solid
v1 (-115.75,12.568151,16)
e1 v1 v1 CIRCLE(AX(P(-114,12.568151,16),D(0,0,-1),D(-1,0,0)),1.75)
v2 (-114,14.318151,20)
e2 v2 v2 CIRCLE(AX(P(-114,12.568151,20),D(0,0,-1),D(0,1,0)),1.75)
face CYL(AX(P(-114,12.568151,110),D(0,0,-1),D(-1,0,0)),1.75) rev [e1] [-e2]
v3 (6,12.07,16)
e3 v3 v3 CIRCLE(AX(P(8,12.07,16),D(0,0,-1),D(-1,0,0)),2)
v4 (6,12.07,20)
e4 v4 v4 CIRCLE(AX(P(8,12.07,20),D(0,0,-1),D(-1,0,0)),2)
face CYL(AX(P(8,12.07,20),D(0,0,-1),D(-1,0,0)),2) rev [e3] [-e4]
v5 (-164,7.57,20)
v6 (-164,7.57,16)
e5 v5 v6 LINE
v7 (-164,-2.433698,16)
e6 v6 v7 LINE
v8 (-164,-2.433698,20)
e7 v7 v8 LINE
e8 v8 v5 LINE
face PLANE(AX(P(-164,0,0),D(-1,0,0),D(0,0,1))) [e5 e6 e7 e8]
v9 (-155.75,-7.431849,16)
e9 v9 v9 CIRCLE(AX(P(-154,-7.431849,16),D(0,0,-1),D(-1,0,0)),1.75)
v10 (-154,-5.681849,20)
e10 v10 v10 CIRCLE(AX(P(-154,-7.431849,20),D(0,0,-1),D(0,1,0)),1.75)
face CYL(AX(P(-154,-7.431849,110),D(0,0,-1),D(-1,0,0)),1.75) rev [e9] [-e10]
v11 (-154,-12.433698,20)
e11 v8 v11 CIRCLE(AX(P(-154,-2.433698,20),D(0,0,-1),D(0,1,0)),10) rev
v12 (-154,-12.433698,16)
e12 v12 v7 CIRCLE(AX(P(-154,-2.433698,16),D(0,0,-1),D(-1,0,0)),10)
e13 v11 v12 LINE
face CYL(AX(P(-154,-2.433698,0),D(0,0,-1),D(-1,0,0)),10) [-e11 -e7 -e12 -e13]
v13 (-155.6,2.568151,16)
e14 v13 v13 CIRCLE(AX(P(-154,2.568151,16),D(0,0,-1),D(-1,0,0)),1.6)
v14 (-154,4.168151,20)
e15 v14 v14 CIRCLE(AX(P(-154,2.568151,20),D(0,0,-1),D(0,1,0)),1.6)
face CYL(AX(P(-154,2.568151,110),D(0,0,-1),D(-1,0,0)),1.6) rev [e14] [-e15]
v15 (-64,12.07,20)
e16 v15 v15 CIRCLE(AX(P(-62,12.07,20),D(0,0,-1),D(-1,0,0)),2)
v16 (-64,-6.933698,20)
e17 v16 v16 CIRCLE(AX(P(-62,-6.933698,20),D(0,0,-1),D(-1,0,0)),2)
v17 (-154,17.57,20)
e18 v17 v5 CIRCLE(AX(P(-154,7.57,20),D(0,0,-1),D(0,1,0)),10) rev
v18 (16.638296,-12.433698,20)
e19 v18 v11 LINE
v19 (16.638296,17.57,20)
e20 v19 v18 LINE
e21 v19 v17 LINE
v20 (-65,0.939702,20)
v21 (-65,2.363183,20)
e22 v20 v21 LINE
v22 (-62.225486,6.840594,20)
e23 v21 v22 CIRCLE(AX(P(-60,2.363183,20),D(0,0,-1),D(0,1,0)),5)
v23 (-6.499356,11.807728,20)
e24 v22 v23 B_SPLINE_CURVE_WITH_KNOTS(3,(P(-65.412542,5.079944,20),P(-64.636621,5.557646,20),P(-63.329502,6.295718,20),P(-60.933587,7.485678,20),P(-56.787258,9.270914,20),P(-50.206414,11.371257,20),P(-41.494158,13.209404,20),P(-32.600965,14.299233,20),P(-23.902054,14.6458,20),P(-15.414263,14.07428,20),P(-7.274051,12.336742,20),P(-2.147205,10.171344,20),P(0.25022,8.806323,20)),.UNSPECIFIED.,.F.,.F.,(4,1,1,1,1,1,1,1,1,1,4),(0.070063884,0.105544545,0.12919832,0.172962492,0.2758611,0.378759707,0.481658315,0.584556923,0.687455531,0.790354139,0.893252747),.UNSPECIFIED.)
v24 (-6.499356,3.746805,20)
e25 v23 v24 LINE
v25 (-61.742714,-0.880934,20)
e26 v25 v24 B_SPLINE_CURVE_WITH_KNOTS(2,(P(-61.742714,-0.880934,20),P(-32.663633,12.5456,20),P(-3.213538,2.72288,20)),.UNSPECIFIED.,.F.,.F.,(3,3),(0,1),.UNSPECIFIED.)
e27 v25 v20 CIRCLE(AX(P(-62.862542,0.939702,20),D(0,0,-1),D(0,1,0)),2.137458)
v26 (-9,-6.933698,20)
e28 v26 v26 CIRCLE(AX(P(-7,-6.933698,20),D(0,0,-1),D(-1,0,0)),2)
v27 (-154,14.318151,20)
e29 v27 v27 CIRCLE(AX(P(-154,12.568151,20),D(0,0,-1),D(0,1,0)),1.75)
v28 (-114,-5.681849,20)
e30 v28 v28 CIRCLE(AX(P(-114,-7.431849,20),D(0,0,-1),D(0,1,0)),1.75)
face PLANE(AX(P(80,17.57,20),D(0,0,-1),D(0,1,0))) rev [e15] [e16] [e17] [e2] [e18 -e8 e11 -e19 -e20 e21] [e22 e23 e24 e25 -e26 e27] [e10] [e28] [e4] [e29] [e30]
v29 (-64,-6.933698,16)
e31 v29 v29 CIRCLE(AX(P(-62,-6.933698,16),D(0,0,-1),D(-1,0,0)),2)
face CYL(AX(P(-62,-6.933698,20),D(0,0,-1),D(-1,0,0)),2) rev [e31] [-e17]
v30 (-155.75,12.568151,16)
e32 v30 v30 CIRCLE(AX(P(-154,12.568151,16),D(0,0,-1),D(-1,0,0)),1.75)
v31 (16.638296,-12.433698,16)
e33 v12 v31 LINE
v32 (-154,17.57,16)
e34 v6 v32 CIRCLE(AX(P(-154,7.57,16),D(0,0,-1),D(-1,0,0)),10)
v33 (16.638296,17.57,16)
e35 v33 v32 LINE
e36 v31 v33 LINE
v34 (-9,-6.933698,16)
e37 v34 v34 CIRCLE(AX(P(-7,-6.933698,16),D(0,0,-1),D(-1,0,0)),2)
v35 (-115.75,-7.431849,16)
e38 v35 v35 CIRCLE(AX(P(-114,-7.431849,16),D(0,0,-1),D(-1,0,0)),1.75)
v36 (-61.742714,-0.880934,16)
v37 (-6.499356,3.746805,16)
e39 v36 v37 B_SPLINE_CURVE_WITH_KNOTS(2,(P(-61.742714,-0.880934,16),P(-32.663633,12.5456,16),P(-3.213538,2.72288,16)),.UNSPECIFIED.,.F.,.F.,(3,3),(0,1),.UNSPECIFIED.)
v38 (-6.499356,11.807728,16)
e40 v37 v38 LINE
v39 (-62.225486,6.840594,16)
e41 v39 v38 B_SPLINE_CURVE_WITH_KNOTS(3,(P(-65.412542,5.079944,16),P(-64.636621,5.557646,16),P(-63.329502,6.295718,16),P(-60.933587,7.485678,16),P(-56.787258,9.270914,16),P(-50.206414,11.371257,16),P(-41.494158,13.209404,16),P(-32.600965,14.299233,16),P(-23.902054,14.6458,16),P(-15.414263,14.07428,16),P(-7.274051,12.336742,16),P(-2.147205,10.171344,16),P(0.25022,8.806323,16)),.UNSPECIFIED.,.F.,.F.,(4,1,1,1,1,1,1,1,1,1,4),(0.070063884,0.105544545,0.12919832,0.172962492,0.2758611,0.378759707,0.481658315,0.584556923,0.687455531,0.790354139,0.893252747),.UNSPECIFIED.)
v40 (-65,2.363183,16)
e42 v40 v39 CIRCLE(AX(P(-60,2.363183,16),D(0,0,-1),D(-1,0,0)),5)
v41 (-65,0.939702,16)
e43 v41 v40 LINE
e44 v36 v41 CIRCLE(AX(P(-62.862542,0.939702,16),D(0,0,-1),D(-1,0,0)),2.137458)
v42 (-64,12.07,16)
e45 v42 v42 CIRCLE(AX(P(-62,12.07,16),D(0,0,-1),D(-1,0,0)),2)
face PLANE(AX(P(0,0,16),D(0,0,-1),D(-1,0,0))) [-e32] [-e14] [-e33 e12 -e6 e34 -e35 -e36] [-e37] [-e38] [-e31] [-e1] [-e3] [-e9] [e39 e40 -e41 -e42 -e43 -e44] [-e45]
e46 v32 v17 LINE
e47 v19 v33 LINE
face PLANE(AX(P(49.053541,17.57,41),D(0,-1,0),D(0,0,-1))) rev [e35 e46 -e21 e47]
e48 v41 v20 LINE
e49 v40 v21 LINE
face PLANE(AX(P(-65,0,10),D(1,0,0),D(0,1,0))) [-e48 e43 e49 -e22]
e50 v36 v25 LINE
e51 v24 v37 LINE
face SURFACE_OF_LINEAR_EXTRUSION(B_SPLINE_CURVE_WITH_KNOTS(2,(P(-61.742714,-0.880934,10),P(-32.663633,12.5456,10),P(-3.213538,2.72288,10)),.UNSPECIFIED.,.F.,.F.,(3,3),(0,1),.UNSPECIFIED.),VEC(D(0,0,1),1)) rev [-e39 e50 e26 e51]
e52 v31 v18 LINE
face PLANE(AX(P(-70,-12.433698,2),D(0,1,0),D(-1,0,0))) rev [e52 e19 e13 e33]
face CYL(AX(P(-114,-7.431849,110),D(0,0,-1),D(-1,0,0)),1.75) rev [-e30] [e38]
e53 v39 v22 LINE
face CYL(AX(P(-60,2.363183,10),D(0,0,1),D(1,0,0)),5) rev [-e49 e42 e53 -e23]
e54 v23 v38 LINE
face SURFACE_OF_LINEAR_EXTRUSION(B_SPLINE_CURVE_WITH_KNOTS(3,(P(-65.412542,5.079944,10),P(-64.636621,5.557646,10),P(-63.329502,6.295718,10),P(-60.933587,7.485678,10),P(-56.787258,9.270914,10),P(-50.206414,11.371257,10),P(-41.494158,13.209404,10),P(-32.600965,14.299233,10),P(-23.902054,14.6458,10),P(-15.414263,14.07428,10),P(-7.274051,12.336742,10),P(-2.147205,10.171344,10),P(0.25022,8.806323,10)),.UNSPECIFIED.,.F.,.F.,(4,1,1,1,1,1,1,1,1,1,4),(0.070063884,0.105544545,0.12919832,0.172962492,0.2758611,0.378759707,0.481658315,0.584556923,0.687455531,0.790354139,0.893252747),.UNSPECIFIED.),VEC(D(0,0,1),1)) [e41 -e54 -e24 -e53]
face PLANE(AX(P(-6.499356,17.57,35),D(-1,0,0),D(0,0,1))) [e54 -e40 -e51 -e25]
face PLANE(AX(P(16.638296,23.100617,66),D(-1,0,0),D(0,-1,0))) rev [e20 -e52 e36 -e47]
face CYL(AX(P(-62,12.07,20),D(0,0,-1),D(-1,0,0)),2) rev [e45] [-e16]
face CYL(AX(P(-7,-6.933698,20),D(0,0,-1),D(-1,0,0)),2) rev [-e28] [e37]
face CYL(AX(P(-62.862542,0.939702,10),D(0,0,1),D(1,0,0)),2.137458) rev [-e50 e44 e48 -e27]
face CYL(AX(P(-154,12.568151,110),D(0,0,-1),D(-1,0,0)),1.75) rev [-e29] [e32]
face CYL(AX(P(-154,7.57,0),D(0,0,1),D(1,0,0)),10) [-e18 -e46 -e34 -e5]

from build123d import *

# Parameters (mm, degrees)
SKETCH_1_W           = 140
SKETCH_1_H           = 40
EXTRUDE_1_DEPTH      = 35
CUT_EXTRUDE_START    = -25
CUT_EXTRUDE_1_DEPTH  = 25
SKETCH_3_W           = 20.946458808
SKETCH_3_H           = 40
CUT_EXTRUDE_2_DEPTH  = 50
SKETCH_4_W           = 119.053541192
SKETCH_4_H           = 40
CUT_EXTRUDE_3_DEPTH  = 16
SKETCH_5_W           = 119.053541192
SKETCH_5_H           = 7.566301572
CUT_EXTRUDE_4_DEPTH  = 33
FILLET_1_R           = 5
SKETCH_6_W           = 119.053541192
SKETCH_6_H           = 32.433698428
EXTRUDE_2_DEPTH      = 3
SKETCH_7_W           = 119.053541192
SKETCH_7_H           = 2.43
CUT_EXTRUDE_5_DEPTH  = 25
FILLET_2_R           = 15
SKETCH_10_W          = 35.667768889
SKETCH_10_H          = 41.429485403
CUT_EXTRUDE_8_DEPTH  = 50
SKETCH_11_W          = 23.137651911
SKETCH_11_H          = 30.003698428
EXTRUDE_3_DEPTH      = 19
SKETCH_12_W          = 18
SKETCH_12_H          = 30.003698428
CUT_EXTRUDE_9_DEPTH  = 150
SKETCH_8_R           = 2
CUT_EXTRUDE_10_DEPTH = 4
SKETCH_13_W          = 4
SKETCH_13_H          = 30.003698428
EXTRUDE_4_DEPTH      = 94
SKETCH_14_R          = 1.6
SKETCH_14_R_2        = 1.75
CUT_EXTRUDE_11_DEPTH = 94
FILLET_4_R           = 10


# Read off the part's stored shape, not the designer's step: 切除-拉伸1
with BuildPart() as part:
    # 草图1 → 凸台-拉伸1 (new body)
    with BuildSketch(Plane.XY):
        Rectangle(SKETCH_1_W, SKETCH_1_H)
    extrude(amount=EXTRUDE_1_DEPTH)

    # 切除-拉伸1 outline → 切除-拉伸1 (cut)
    with BuildSketch(Plane.XY.offset(35).offset(CUT_EXTRUDE_START)):
        with BuildLine():
            ThreePointArc((-65, 0.939701666), (-63.90540849, -0.926084141), (-61.742713718, -0.880933602))
            add(Edge.make_bspline(
                [(-61.742713718, -0.880933602), (-32.663633491, 12.545599653), (-3.21353823, 2.722880029)],
                knots=[0, 0, 0, 1, 1, 1], degree=2))
            add(Edge.make_bspline(
                [(-3.21353823, 2.722880029), (7.778991577, -3.486736981), (19.521763095, -12.075038105), (32.974458778, -10.310789055)],
                knots=[0, 0, 0, 0, 1, 1, 1, 1], degree=3))
            add(Edge.make_bspline(
                [(-1.265226953, 9.621082728), (5.319961167, 7.826511536), (19.072649984, 4.273931772), (30.116773563, 18.680420492), (50.141031873, 7.903163107), (40.152384038, -8.700046956), (32.974458778, -10.310789055)],
                knots=[0, 0, 0, 0, 0.327114299, 0.472643013, 0.672292196, 1, 1, 1, 1], degree=3))
            add(Edge.make_bspline(
                [(-62.225486261, 6.840593766), (-61.950401652, 6.977325912), (-60.645663364, 7.609645854), (-56.787258029, 9.270913685), (-50.206414035, 11.371256832), (-41.494158434, 13.209404155), (-32.600965324, 14.299233241), (-23.90205386, 14.645800276), (-15.41426271, 14.074279585), (-7.837972032, 12.457111584), (-3.215945129, 10.610499943), (-1.265226953, 9.621082728)],
                knots=[0.117371432, 0.117371432, 0.117371432, 0.117371432, 0.12919832, 0.172962492, 0.2758611, 0.378759707, 0.481658315, 0.584556923, 0.687455531, 0.790354139, 0.871867558, 0.871867558, 0.871867558, 0.871867558], degree=3))
            ThreePointArc((-62.225486261, 6.840593766), (-64.250143015, 4.996865242), (-65, 2.363182583))
            Line((-65, 2.363182583), (-65, 0.939701666))
        make_face()
    extrude(amount=CUT_EXTRUDE_1_DEPTH, mode=Mode.SUBTRACT)

    # 草图3 → 切除-拉伸2 (cut)
    with BuildSketch(Plane.XY.offset(35)):
        with Locations((59.526770596, 0)):
            Rectangle(SKETCH_3_W, SKETCH_3_H)
    extrude(amount=-CUT_EXTRUDE_2_DEPTH, mode=Mode.SUBTRACT)

    # 草图4 → 切除-拉伸3 (cut)
    with BuildSketch(Plane(origin=(0, 0, 0), x_dir=(-1, 0, 0), z_dir=(0, 0, -1))):
        with Locations((10.473229404, 0)):
            Rectangle(SKETCH_4_W, SKETCH_4_H)
    extrude(amount=-CUT_EXTRUDE_3_DEPTH, mode=Mode.SUBTRACT)

    # 草图5 → 切除-拉伸4 (cut)
    with BuildSketch(Plane.XY.offset(35)):
        with Locations((-10.473229404, -16.216849214)):
            Rectangle(SKETCH_5_W, SKETCH_5_H)
    extrude(amount=-CUT_EXTRUDE_4_DEPTH, mode=Mode.SUBTRACT)

    # 圆角1
    fillet_1_edges = [part.edges().sort_by_distance(p)[0] for p in [
        (-3.21353823, 2.722880029, 25.5),
        (-1.265226953, 9.621082728, 25.5),
    ]]
    fillet(fillet_1_edges, radius=FILLET_1_R)

    # 草图6 → 凸台-拉伸2 (add)
    with BuildSketch(Plane.XY.offset(35)):
        with Locations((-10.473229404, 3.783150786)):
            Rectangle(SKETCH_6_W, SKETCH_6_H)
    extrude(amount=EXTRUDE_2_DEPTH)

    # 草图7 → 切除-拉伸5 (cut)
    with BuildSketch(Plane(origin=(0, 0, 16), x_dir=(-1, 0, 0), z_dir=(0, 0, -1))):
        with Locations((10.473229404, 18.785)):
            Rectangle(SKETCH_7_W, SKETCH_7_H)
    extrude(amount=-CUT_EXTRUDE_5_DEPTH, mode=Mode.SUBTRACT)

    # 圆角2
    fillet_2_edges = [part.edges().sort_by_distance(p)[0] for p in [
        (49.053541192, 17.57, 27),
        (49.053541192, -12.433698428, 27),
    ]]
    fillet(fillet_2_edges, radius=FILLET_2_R)

    # 草图10 → 切除-拉伸8 (cut)
    with BuildSketch(Plane(origin=(0, 0, 16), x_dir=(-1, 0, 0), z_dir=(0, 0, -1))):
        with Locations((-34.472180194, 2.38587436)):
            Rectangle(SKETCH_10_W, SKETCH_10_H)
    extrude(amount=-CUT_EXTRUDE_8_DEPTH, mode=Mode.SUBTRACT)

    # 草图11 → 凸台-拉伸3 (add)
    with BuildSketch(Plane(origin=(0, 0, 16), x_dir=(-1, 0, 0), z_dir=(0, 0, -1))):
        with Locations((-5.069469793, 2.568150786)):
            Rectangle(SKETCH_11_W, SKETCH_11_H)
    extrude(amount=-EXTRUDE_3_DEPTH)

    # 草图12 → 切除-拉伸9 (cut)
    with BuildSketch(Plane.ZY.offset(70)):
        with Locations((29, 2.568150786)):
            Rectangle(SKETCH_12_W, SKETCH_12_H)
    extrude(amount=-CUT_EXTRUDE_9_DEPTH, mode=Mode.SUBTRACT)

    # 草图8 → 切除-拉伸10 (cut)
    with BuildSketch(Plane(origin=(0, 0, 16), x_dir=(-1, 0, 0), z_dir=(0, 0, -1))):
        with Locations((62, 12.07)):
            Circle(SKETCH_8_R)
        with Locations((-8, 12.07)):
            Circle(SKETCH_8_R)
        with Locations((62, -6.933698428)):
            Circle(SKETCH_8_R)
        with Locations((7, -6.933698428)):
            Circle(SKETCH_8_R)
    extrude(amount=-CUT_EXTRUDE_10_DEPTH, mode=Mode.SUBTRACT)

    # 草图13 → 凸台-拉伸4 (add)
    with BuildSketch(Plane.ZY.offset(70)):
        with Locations((18, 2.568150786)):
            Rectangle(SKETCH_13_W, SKETCH_13_H)
    extrude(amount=EXTRUDE_4_DEPTH)

    # 草图14 → 切除-拉伸11 (cut)
    with BuildSketch(Plane(origin=(0, 0, 16), x_dir=(-1, 0, 0), z_dir=(0, 0, -1))):
        with Locations((154, 2.568150786)):
            Circle(SKETCH_14_R)
        with Locations((114, 12.568150786)):
            Circle(SKETCH_14_R_2)
        with Locations((154, 12.568150786)):
            Circle(SKETCH_14_R_2)
        with Locations((154, -7.431849214)):
            Circle(SKETCH_14_R_2)
        with Locations((114, -7.431849214)):
            Circle(SKETCH_14_R_2)
    extrude(amount=-CUT_EXTRUDE_11_DEPTH, mode=Mode.SUBTRACT)

    # 圆角4
    fillet_4_edges = [part.edges().sort_by_distance(p)[0] for p in [
        (-164, -12.433698428, 18),
        (-164, 17.57, 18),
    ]]
    fillet(fillet_4_edges, radius=FILLET_4_R)


solid = part.part
